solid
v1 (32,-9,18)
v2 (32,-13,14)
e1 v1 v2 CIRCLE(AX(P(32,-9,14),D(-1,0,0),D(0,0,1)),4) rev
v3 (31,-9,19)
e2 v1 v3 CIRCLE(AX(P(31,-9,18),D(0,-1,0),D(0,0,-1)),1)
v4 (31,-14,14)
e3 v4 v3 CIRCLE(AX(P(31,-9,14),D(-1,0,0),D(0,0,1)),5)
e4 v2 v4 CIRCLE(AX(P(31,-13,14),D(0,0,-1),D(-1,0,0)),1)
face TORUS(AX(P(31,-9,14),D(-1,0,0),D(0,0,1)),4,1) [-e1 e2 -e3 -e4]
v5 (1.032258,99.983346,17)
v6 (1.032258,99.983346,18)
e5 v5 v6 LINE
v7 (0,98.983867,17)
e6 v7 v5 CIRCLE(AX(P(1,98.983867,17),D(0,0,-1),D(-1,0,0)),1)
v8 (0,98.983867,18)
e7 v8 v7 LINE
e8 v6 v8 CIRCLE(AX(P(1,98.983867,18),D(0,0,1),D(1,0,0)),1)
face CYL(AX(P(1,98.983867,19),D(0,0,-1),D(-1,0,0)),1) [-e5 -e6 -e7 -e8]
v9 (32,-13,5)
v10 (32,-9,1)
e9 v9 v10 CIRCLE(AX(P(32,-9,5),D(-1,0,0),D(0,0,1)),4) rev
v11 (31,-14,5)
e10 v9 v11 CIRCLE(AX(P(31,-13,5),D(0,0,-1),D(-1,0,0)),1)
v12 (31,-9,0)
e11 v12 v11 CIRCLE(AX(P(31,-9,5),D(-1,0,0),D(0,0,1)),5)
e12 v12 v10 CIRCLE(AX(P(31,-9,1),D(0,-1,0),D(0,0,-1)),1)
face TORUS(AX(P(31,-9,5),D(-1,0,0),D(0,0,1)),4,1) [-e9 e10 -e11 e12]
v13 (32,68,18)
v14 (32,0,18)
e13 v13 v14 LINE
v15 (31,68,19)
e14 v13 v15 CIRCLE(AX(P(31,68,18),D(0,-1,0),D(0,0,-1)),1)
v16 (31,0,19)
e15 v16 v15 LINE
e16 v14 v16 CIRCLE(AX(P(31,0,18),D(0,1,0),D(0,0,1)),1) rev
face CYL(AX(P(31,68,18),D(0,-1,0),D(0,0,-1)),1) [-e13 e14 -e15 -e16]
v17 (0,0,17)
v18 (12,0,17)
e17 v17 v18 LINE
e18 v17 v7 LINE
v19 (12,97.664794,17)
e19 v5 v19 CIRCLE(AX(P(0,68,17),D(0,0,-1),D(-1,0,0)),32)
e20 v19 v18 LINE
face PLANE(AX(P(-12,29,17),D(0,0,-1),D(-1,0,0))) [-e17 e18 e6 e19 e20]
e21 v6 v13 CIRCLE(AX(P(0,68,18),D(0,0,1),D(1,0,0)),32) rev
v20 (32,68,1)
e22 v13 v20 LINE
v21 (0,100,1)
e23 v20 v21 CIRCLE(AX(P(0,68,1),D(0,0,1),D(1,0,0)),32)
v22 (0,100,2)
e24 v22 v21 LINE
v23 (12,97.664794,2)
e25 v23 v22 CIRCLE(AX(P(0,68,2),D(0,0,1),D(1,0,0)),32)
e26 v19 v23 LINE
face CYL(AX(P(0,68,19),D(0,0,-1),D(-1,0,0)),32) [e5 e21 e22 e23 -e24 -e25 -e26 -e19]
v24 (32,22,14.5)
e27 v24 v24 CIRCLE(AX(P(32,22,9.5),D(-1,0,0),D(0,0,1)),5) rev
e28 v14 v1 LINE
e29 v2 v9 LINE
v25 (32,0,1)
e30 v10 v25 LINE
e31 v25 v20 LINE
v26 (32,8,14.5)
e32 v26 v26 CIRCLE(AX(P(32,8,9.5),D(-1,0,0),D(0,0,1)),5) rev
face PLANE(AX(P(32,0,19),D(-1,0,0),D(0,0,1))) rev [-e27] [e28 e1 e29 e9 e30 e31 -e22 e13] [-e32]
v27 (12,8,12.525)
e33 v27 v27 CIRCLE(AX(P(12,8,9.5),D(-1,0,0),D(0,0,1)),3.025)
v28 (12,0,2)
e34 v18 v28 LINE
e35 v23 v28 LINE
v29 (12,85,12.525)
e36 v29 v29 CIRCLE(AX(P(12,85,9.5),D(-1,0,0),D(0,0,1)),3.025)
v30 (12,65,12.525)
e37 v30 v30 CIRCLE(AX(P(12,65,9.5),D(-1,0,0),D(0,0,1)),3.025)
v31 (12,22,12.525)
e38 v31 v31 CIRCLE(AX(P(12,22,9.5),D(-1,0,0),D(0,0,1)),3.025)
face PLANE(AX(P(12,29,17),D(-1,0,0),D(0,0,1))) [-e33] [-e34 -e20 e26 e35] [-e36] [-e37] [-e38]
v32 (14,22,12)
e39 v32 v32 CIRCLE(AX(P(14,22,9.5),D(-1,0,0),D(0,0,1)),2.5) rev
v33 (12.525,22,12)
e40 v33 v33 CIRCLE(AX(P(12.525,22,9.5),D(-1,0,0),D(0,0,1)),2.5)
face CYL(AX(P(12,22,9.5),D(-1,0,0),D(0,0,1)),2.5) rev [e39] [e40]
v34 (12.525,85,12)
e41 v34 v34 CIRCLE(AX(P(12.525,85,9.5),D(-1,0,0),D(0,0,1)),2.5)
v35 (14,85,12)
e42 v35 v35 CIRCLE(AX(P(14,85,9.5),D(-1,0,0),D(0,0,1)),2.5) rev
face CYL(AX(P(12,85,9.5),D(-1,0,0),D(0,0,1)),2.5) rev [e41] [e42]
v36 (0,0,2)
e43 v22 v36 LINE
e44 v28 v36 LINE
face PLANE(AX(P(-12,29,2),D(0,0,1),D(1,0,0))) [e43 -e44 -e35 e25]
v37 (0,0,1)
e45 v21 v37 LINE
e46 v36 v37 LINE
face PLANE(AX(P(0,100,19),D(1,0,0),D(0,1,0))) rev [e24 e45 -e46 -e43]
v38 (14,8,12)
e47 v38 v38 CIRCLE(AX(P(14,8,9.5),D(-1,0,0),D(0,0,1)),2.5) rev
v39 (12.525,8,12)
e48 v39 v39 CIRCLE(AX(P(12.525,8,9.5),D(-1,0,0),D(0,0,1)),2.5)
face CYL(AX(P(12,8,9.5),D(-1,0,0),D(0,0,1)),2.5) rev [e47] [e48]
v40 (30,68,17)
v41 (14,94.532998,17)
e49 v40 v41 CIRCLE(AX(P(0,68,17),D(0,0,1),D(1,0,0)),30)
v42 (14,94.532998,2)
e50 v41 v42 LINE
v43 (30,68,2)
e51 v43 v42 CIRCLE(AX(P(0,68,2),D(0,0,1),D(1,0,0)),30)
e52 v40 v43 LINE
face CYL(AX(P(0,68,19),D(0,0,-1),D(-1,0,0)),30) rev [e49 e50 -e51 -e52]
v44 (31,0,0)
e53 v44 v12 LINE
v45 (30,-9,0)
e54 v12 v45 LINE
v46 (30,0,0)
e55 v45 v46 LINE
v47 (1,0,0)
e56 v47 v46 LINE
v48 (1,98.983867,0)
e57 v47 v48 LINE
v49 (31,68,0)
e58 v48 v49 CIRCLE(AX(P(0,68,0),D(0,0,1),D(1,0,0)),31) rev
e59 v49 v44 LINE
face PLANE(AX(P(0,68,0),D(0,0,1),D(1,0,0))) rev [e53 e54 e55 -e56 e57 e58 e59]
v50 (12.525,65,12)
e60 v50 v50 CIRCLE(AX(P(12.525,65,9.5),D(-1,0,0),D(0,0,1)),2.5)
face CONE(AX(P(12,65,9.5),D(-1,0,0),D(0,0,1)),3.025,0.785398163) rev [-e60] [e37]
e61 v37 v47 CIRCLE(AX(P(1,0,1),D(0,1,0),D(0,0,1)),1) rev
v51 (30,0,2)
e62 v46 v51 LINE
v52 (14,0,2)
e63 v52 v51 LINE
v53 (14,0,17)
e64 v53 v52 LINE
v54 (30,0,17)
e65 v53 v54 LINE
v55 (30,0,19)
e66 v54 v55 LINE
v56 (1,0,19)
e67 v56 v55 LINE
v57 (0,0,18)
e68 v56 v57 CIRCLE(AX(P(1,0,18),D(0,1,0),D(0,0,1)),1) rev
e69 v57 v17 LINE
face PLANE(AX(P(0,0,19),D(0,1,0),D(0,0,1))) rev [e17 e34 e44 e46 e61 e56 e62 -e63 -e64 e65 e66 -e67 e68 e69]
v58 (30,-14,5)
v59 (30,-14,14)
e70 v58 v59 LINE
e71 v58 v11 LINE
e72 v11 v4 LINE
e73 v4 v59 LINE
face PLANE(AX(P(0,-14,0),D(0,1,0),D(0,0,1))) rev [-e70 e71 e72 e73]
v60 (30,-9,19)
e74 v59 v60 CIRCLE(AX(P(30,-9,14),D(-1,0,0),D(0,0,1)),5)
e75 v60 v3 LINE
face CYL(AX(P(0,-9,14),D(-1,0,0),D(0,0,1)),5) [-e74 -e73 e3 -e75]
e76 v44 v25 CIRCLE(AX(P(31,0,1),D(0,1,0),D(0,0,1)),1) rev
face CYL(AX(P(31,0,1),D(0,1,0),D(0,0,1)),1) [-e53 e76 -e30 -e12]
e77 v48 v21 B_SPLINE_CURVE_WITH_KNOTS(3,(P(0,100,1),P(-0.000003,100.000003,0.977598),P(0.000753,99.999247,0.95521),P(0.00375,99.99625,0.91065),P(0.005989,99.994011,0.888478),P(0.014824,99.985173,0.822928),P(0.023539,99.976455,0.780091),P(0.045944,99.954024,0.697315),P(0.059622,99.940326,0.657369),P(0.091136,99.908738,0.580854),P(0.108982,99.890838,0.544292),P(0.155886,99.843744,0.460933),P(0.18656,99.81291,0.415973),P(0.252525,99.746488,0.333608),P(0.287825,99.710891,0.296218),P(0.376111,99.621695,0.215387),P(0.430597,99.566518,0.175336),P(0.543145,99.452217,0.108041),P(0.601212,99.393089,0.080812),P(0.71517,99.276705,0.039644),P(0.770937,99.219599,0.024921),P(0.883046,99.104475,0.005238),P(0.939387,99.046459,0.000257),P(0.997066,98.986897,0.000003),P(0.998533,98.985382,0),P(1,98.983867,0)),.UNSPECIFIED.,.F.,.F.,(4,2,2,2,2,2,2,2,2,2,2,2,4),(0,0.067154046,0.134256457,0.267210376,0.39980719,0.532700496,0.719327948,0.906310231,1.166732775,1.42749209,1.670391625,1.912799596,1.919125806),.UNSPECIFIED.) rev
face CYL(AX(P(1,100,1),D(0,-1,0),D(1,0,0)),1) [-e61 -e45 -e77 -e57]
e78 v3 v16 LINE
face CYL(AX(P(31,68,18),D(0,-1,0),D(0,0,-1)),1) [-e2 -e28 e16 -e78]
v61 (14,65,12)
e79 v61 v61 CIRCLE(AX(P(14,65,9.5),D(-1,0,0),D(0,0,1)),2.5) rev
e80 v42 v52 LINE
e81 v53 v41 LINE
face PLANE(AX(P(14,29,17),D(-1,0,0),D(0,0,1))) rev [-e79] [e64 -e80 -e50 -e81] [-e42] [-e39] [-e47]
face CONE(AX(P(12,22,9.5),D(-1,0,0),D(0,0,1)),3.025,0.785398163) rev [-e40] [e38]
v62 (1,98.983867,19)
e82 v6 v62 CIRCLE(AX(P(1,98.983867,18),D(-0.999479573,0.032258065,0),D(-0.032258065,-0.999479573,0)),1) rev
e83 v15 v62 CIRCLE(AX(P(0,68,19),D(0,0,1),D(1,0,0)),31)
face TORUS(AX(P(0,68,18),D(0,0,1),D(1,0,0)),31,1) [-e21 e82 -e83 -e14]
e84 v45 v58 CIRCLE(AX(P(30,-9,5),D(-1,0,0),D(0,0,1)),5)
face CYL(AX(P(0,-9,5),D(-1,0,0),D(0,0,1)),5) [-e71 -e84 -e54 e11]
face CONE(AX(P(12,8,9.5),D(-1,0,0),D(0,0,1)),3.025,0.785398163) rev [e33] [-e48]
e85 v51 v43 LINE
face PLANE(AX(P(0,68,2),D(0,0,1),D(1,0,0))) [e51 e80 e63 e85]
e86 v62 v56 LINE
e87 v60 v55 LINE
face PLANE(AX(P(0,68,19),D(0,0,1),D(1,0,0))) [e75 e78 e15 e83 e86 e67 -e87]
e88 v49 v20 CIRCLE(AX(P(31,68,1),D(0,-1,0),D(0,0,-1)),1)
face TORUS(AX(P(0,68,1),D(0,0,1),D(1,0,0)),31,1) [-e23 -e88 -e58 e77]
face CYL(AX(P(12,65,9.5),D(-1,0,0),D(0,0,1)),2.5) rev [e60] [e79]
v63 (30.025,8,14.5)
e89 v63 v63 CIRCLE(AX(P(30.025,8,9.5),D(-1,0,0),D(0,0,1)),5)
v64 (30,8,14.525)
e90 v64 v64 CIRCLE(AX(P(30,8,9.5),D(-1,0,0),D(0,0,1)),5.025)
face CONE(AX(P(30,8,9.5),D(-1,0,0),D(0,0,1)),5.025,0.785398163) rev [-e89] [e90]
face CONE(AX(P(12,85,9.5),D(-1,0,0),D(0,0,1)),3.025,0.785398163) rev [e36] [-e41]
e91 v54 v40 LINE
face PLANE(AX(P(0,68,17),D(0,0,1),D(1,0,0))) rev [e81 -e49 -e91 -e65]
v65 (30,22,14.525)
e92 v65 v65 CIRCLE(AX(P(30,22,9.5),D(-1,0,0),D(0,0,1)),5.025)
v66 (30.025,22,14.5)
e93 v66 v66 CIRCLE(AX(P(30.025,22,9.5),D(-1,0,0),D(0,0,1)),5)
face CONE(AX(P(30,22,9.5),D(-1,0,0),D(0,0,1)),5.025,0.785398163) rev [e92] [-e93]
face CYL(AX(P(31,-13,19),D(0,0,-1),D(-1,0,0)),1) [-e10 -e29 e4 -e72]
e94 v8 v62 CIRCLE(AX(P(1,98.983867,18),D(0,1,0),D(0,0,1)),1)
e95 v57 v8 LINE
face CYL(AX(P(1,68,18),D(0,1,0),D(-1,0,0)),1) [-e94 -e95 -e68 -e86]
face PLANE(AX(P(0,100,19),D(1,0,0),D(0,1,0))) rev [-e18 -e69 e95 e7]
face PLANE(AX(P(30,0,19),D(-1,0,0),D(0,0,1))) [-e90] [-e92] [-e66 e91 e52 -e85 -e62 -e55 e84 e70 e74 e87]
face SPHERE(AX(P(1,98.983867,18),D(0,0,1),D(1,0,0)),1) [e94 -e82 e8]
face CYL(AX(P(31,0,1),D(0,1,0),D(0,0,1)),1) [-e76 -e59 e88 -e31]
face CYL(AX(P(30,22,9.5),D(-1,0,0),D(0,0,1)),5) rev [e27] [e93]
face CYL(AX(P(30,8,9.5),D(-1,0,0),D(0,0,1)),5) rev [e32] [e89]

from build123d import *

# Parameters (mm, degrees)
BOSS_EXTRUDE1_DEPTH = 19
SKETCH2_W           = 24
SKETCH2_H           = 15
CUT_EXTRUDE1_DEPTH  = 29
SKETCH2_2_W         = 24
SKETCH2_2_H         = 15
CUT_EXTRUDE2_DEPTH  = 109
SHELL2_START        = 2
SHELL2_DEPTH        = 15
FILLET1_R           = 1
SKETCH8_W           = 2
SKETCH8_H           = 19
BOSS_EXTRUDE2_DEPTH = 14
FILLET3_R           = 5
FILLET4_R           = 1


# Read off the part's stored shape, not the designer's step: Shell2, M6 Tapped Hole1, Ø10.0mm Dowel Hole1
with BuildPart() as part:
    # Sketch1 → Boss-Extrude1 (new body)
    with BuildSketch(Plane.XY):
        with BuildLine():
            Line((32, 0), (32, 68))
            ThreePointArc((32, 68), (22.627416998, 90.627416998), (0, 100))
            Line((0, 100), (0, 0))
            Line((0, 0), (32, 0))
        make_face()
    extrude(amount=BOSS_EXTRUDE1_DEPTH)

    # Sketch2 → Cut-Extrude1 (cut)
    with BuildSketch(Plane(origin=(0, 0, 0), x_dir=(1, 0, 0), z_dir=(0, 1, 0))):
        with Locations((0, -9.5)):
            Rectangle(SKETCH2_W, SKETCH2_H)
    extrude(amount=CUT_EXTRUDE1_DEPTH, mode=Mode.SUBTRACT)

    # Sketch2<2> → Cut-Extrude2 (cut)
    with BuildSketch(Plane(origin=(0, 0, 0), x_dir=(1, 0, 0), z_dir=(0, 1, 0))):
        with Locations((0, -9.5)):
            Rectangle(SKETCH2_2_W, SKETCH2_2_H)
    extrude(amount=CUT_EXTRUDE2_DEPTH, mode=Mode.SUBTRACT)

    # Shell2 outline → Shell2 (cut)
    with BuildSketch(Plane.XY.offset(SHELL2_START)):
        with BuildLine():
            ThreePointArc((30, 68), (25.690465157, 83.491933385), (14, 94.532998323))
            Line((14, 94.532998323), (14, 0))
            Line((14, 0), (30, 0))
            Line((30, 0), (30, 68))
        make_face()
    extrude(amount=SHELL2_DEPTH, mode=Mode.SUBTRACT)

    # M6 Tapped Hole1 outline → M6 Tapped Hole1 (revolve, cut)
    with BuildSketch(Plane(origin=(0, 85, 9.5), x_dir=(0, 1, 0), z_dir=(0, 0, -1))):
        Polygon((2.5, 12.525), (2.5, 14), (0, 14), (0, 12), (3.025, 12), align=None)
    revolve(axis=Axis((0, 85, 9.5), (1, 0, 0)), mode=Mode.SUBTRACT)

    # M6 Tapped Hole1 2 outline → M6 Tapped Hole1 2 (revolve, cut)
    with BuildSketch(Plane(origin=(0, 65, 9.5), x_dir=(0, 1, 0), z_dir=(0, 0, -1))):
        Polygon((2.5, 12.525), (2.5, 14), (0, 14), (0, 12), (3.025, 12), align=None)
    revolve(axis=Axis((0, 65, 9.5), (1, 0, 0)), mode=Mode.SUBTRACT)

    # M6 Tapped Hole1 3 outline → M6 Tapped Hole1 3 (revolve, cut)
    with BuildSketch(Plane(origin=(0, 8, 9.5), x_dir=(0, 1, 0), z_dir=(0, 0, -1))):
        Polygon((2.5, 12.525), (2.5, 14), (0, 14), (0, 12), (3.025, 12), align=None)
    revolve(axis=Axis((0, 8, 9.5), (1, 0, 0)), mode=Mode.SUBTRACT)

    # M6 Tapped Hole1 4 outline → M6 Tapped Hole1 4 (revolve, cut)
    with BuildSketch(Plane(origin=(0, 22, 9.5), x_dir=(0, 1, 0), z_dir=(0, 0, -1))):
        Polygon((2.5, 12.525), (2.5, 14), (0, 14), (0, 12), (3.025, 12), align=None)
    revolve(axis=Axis((0, 22, 9.5), (1, 0, 0)), mode=Mode.SUBTRACT)

    # Ø10.0mm Dowel Hole1 outline → Ø10.0mm Dowel Hole1 (revolve, cut)
    with BuildSketch(Plane(origin=(0, 8, 9.5), x_dir=(0, 1, 0), z_dir=(0, 0, -1))):
        Polygon((5, 30.025), (5, 32), (0, 32), (0, 30), (5.025, 30), align=None)
    revolve(axis=Axis((0, 8, 9.5), (1, 0, 0)), mode=Mode.SUBTRACT)

    # 10.0mm Dowel Hole1 2 outline → 10.0mm Dowel Hole1 2 (revolve, cut)
    with BuildSketch(Plane(origin=(0, 22, 9.5), x_dir=(0, 1, 0), z_dir=(0, 0, -1))):
        Polygon((5, 30.025), (5, 32), (0, 32), (0, 30), (5.025, 30), align=None)
    revolve(axis=Axis((0, 22, 9.5), (1, 0, 0)), mode=Mode.SUBTRACT)

    # Fillet1
    fillet1_edges = [part.edges().sort_by_distance(p)[0] for p in [
        (22.627416998, 90.627416998, 19),
        (0, 50, 19),
        (0, 50, 0),
        (22.627416998, 90.627416998, 0),
        (32, 34, 0),
        (0, 100, 18),
        (32, 34, 19),
    ]]
    fillet(fillet1_edges, radius=FILLET1_R)

    # Sketch8 → Boss-Extrude2 (add)
    with BuildSketch(Plane(origin=(0, 0, 0), x_dir=(1, 0, 0), z_dir=(0, 1, 0))):
        with Locations((31, -9.5)):
            Rectangle(SKETCH8_W, SKETCH8_H)
    extrude(amount=-BOSS_EXTRUDE2_DEPTH)

    # Fillet3
    fillet3_edges = [part.edges().sort_by_distance(p)[0] for p in [
        (31, -14, 19),
        (31, -14, 0),
    ]]
    fillet(fillet3_edges, radius=FILLET3_R)

    # Fillet4
    fillet4_edges = [part.edges().sort_by_distance(p)[0] for p in [
        (32, -12.535533906, 1.464466094),
        (32, -14, 9.5),
        (32, -12.535533906, 17.535533906),
        (32, -4.5, 0),
        (32, -4.5, 19),
    ]]
    fillet(fillet4_edges, radius=FILLET4_R)


solid = part.part
